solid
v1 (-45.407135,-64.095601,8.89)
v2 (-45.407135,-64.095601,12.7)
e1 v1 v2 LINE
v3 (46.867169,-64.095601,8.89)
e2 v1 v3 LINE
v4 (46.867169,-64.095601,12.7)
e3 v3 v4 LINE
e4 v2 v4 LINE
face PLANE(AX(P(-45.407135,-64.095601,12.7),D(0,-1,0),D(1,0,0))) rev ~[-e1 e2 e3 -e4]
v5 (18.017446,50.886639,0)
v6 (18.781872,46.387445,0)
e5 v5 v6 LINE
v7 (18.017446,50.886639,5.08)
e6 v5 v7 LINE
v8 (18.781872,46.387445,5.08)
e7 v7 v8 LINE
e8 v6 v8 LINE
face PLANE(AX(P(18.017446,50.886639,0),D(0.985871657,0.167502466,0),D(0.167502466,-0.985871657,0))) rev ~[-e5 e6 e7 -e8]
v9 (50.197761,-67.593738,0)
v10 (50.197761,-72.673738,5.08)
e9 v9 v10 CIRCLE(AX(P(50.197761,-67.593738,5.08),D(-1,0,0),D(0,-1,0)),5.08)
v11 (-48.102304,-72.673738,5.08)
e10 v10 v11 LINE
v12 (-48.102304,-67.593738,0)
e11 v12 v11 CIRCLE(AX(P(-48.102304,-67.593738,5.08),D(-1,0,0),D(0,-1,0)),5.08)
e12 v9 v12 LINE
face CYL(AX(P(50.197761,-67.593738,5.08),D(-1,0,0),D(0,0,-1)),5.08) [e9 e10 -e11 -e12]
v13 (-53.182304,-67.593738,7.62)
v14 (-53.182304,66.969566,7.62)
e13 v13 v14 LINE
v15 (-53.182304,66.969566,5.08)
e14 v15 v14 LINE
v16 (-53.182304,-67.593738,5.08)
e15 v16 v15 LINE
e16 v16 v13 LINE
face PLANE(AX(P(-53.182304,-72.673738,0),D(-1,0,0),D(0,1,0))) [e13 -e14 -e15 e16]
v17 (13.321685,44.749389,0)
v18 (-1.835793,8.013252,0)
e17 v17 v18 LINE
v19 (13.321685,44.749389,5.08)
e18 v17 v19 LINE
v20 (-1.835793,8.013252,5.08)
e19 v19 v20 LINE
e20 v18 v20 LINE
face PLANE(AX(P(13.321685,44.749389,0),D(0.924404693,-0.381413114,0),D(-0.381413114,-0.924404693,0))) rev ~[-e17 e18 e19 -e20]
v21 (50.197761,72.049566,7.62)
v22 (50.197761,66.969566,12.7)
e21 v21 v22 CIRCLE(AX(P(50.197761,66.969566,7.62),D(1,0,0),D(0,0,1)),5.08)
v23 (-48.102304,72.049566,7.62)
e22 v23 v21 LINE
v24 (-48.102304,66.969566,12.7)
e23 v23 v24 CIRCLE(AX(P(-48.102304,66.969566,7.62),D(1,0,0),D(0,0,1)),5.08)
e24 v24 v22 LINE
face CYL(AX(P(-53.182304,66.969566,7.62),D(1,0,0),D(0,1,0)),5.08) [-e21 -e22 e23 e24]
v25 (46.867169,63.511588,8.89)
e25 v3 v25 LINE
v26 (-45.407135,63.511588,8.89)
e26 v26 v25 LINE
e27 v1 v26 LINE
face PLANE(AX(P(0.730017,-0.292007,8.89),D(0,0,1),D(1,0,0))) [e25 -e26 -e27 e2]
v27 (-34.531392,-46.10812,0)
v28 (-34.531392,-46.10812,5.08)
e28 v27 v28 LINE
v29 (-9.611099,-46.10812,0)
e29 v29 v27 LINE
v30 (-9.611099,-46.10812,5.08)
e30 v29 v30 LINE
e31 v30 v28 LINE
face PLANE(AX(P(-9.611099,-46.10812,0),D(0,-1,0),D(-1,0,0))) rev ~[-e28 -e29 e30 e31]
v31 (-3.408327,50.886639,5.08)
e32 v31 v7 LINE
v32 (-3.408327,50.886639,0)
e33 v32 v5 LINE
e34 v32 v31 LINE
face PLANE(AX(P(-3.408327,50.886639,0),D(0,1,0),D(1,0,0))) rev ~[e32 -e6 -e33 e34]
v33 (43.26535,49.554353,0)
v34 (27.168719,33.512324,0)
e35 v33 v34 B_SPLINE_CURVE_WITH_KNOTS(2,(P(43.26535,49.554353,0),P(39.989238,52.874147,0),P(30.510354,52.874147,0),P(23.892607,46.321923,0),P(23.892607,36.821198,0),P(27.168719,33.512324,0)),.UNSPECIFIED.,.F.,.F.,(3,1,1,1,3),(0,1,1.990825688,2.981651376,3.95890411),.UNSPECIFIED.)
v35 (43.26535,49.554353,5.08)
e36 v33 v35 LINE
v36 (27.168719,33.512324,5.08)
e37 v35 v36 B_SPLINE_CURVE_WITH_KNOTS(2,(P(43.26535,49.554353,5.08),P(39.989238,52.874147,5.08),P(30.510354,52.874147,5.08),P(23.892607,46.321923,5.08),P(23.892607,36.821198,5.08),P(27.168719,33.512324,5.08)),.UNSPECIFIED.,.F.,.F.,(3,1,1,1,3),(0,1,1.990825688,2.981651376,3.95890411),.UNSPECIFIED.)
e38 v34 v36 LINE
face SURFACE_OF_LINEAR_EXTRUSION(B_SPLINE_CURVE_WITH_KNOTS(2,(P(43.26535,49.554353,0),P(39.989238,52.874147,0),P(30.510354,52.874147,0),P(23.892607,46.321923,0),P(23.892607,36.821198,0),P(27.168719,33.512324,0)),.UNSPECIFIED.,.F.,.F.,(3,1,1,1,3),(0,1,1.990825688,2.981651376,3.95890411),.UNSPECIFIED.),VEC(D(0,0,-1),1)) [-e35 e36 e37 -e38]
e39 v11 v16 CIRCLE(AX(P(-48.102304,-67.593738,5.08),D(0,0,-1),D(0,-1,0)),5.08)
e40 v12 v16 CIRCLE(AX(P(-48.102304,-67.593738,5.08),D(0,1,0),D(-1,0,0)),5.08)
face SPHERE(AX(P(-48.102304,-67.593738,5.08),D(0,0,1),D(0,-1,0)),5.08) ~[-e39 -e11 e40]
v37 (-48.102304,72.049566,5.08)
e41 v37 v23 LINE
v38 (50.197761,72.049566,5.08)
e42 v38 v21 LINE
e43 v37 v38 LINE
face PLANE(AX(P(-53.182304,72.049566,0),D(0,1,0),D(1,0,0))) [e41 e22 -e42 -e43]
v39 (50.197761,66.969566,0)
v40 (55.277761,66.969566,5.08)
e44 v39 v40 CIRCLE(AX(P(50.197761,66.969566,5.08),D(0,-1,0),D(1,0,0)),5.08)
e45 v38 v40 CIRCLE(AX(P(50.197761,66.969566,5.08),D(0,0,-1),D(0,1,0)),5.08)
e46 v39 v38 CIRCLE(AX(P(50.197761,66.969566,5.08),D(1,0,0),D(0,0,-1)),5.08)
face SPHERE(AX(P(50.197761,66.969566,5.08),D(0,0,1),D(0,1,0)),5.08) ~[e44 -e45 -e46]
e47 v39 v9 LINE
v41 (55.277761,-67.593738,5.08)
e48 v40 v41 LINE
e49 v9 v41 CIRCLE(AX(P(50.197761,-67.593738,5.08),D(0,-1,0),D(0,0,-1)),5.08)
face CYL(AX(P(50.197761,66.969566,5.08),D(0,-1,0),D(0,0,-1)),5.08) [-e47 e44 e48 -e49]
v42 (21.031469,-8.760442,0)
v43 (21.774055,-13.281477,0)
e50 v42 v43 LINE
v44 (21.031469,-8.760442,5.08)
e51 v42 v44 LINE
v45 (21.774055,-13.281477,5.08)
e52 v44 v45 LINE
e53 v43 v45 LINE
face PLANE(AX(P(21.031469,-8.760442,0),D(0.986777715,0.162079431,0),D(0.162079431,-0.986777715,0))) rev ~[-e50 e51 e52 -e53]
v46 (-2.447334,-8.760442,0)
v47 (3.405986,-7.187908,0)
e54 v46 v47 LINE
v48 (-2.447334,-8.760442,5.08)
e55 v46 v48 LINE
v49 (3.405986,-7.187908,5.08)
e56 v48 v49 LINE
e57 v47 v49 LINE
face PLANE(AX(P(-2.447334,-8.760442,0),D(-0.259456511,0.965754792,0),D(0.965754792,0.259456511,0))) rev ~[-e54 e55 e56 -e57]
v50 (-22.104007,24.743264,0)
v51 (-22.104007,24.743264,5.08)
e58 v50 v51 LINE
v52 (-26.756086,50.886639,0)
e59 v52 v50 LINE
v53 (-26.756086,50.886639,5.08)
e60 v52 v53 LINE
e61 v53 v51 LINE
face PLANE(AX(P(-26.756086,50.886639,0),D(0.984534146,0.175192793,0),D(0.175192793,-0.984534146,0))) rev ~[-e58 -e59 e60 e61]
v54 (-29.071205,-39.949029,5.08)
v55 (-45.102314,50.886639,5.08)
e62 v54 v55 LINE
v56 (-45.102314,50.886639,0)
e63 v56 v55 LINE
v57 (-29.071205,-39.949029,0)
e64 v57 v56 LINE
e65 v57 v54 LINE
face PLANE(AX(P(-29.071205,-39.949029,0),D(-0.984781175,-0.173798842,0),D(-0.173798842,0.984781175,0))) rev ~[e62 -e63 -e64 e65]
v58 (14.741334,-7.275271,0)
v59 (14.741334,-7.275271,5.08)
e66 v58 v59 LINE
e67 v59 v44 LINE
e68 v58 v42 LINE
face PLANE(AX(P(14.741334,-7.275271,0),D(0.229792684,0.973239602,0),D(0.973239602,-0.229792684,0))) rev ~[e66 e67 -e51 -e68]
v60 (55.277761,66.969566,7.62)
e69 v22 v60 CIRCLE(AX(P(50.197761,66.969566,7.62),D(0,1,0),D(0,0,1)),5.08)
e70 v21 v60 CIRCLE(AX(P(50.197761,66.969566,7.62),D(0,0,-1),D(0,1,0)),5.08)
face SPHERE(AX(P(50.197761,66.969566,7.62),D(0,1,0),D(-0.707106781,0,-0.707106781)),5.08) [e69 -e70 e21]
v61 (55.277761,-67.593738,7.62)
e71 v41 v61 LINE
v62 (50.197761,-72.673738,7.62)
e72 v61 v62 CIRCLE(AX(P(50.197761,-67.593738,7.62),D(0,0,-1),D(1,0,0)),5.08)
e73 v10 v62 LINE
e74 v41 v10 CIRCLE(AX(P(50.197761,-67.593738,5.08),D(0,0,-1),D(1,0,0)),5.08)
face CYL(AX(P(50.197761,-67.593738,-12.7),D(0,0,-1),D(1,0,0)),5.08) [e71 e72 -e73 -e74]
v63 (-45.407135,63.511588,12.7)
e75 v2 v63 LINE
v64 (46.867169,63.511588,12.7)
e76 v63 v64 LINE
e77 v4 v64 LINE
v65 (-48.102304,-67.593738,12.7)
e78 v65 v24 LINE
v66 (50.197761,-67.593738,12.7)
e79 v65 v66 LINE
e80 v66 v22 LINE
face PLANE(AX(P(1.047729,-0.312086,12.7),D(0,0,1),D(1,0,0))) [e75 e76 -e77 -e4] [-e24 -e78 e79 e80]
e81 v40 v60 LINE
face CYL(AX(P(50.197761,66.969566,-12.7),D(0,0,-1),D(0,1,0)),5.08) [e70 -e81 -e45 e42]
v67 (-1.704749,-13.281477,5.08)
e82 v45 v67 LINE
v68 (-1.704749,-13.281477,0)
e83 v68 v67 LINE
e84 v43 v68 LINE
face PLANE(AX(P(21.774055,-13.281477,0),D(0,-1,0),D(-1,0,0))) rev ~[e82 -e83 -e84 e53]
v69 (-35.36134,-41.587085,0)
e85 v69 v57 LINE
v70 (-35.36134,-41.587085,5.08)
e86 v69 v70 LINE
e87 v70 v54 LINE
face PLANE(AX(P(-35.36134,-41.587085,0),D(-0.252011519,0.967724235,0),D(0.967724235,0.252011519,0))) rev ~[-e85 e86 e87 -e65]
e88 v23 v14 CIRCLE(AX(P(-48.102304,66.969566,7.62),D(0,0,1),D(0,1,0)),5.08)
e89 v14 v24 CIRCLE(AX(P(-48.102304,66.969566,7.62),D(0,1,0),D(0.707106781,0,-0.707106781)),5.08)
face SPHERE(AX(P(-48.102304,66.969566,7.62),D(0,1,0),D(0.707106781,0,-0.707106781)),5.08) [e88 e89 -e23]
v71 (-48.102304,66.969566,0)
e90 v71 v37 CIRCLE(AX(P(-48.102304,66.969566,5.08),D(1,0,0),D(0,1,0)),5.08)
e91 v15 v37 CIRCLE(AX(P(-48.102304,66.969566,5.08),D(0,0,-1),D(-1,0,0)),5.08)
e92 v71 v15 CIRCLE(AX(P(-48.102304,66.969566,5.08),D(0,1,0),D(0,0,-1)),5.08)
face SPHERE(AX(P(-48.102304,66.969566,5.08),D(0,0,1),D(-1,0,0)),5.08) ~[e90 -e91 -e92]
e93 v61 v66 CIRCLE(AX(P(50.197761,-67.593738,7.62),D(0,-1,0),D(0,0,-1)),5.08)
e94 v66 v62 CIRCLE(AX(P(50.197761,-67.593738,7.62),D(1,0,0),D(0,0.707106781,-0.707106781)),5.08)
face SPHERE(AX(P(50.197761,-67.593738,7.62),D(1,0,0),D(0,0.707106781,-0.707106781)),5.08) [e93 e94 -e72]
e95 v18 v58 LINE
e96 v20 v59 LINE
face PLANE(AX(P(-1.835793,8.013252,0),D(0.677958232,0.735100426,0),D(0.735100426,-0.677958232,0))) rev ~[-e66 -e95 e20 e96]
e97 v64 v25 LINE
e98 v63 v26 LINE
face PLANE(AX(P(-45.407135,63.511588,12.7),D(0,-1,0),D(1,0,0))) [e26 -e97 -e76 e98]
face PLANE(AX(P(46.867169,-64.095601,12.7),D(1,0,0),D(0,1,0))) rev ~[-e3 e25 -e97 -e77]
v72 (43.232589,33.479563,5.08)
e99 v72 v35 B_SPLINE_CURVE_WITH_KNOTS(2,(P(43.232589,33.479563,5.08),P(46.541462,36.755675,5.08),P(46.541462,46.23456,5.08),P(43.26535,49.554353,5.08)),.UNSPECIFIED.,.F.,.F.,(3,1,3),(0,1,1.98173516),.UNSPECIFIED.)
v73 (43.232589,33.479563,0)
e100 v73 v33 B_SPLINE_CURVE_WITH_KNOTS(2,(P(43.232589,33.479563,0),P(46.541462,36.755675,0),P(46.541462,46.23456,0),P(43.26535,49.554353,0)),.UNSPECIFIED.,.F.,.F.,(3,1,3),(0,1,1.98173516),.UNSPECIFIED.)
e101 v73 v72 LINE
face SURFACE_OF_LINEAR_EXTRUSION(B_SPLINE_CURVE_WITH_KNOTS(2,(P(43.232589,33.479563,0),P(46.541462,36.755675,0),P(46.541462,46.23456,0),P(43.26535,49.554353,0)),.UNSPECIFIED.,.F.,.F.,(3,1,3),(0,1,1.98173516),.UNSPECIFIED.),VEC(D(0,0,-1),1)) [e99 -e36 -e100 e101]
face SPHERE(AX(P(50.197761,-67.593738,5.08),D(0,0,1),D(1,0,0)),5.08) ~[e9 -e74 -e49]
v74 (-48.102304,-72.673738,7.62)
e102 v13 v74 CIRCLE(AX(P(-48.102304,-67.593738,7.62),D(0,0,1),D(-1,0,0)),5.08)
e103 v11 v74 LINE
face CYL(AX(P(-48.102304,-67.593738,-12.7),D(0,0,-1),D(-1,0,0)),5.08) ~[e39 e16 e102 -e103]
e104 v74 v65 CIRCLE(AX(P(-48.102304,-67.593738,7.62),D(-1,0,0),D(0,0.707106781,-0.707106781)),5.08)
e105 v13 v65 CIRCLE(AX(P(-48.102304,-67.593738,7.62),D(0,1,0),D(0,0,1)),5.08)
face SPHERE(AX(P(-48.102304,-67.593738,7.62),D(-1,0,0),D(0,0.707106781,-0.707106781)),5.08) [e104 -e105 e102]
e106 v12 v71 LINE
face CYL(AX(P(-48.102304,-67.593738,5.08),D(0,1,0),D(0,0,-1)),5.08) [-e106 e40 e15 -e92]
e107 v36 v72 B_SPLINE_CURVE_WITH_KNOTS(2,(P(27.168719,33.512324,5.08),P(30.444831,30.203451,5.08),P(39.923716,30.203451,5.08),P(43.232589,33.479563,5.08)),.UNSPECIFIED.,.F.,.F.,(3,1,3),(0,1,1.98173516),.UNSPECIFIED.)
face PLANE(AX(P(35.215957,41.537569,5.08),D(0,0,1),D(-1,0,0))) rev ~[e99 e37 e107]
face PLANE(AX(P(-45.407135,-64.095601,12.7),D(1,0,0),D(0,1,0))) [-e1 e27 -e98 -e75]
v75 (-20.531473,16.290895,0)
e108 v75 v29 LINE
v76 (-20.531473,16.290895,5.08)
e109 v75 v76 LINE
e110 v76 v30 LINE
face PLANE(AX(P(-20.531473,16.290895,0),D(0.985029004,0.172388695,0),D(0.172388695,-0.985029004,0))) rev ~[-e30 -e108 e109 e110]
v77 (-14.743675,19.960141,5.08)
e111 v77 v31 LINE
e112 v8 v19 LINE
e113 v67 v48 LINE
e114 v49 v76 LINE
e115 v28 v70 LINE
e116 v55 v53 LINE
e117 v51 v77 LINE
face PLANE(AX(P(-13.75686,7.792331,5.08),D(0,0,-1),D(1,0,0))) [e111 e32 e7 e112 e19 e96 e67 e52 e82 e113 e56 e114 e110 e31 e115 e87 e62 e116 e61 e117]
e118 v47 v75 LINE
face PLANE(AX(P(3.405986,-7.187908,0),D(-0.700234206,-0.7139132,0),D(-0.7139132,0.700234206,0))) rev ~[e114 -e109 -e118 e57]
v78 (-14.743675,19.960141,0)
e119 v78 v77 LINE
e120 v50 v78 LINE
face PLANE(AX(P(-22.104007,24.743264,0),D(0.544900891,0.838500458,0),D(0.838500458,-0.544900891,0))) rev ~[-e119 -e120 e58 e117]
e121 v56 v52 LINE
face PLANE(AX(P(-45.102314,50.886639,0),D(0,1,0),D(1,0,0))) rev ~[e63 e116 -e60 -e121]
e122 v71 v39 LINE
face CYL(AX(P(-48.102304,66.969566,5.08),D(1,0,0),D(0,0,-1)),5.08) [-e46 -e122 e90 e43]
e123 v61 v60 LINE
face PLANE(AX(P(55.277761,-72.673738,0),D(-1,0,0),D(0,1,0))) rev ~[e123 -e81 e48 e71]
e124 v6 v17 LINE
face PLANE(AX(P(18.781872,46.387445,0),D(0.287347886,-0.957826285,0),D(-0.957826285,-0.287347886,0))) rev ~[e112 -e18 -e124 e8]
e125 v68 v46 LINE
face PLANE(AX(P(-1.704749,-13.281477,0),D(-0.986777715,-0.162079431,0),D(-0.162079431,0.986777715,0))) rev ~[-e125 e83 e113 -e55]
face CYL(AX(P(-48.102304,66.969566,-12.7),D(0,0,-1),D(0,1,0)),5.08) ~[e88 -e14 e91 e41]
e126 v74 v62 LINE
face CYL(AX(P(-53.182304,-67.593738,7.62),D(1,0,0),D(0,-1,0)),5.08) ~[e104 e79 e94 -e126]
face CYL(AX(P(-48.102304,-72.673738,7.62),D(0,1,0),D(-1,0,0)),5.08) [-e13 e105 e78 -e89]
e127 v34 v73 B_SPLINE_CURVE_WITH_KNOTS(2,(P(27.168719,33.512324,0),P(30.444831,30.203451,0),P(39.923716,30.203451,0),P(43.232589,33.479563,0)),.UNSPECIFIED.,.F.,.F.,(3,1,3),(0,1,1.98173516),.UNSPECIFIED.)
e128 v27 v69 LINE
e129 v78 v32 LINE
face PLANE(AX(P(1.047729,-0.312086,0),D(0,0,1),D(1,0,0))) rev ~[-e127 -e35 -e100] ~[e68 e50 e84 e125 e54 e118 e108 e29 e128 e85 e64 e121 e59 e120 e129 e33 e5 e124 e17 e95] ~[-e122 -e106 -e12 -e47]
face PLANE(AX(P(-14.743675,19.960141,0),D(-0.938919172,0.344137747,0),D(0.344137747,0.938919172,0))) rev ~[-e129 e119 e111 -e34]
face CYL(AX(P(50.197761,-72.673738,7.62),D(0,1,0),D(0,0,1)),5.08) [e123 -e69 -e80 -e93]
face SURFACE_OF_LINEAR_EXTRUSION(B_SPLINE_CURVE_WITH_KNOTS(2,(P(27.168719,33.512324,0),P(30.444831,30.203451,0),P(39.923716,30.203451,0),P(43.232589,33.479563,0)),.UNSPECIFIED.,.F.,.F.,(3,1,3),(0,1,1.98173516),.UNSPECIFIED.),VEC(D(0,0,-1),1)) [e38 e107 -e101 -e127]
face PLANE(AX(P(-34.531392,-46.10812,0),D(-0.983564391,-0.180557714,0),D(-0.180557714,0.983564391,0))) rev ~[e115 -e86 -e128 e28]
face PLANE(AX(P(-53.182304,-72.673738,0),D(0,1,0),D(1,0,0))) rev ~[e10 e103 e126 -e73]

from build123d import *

# Parameters (mm, degrees)
F0_W         = 108.4600649774
F0_H         = 144.723303616
F1_DEPTH     = 12.7
F2_W         = 92.2743044794
F2_H         = 127.6071891189
F3_DEPTH     = 3.81
F4_R         = 5.08
F5_T1_DEPTH  = 20.32
F5_S5_W      = 5.08
F5_S5_H      = 5.08
F5_T6_DEPTH  = 5.08
F5_S11_W     = 5.08
F5_S11_H     = 5.08
F5_T12_DEPTH = 5.08
F5_S17_W     = 5.08
F5_S17_H     = 5.08
F5_T18_DEPTH = 5.08
F5_S23_W     = 5.08
F5_S23_H     = 5.08
F5_T24_DEPTH = 5.08
F7_DEPTH     = 5.08
F8_DEPTH     = 5.08
F9_R         = 5.08


# Not quite as in the source:
# - a fillet or chamfer that OpenCascade refuses, or shapes differently, is made with other operations: its cross-section is extruded or revolved along the edge and cut away or added


with BuildPart() as f1:
    # F0 (on Top) → F1 (new body)
    with BuildSketch(Plane.XY):
        with Locations((1.0477285832, -0.3120861948)):
            Rectangle(F0_W, F0_H)
    extrude(amount=F1_DEPTH)

    # F2 (on face) → F3 (cut, symmetric)
    with BuildSketch(Plane.XY.offset(12.7)):
        with Locations((0.7300172001, -0.29200688)):
            Rectangle(F2_W, F2_H)
    extrude(amount=F3_DEPTH, both=True, mode=Mode.SUBTRACT)

    # F4
    f4_edges = [f1.edges().sort_by_distance(p)[0] for p in [
        (1.047729, 72.049566, 12.7),
        (-53.182304, -0.312086, 12.7),
        (55.277761, -0.312086, 12.7),
        (1.047729, -72.673738, 12.7),
    ]]
    fillet(f4_edges, radius=F4_R)

    # F5: fillet of radius 5.08 on 4 edges, made by hand

    # F5_s2 → F5_t1 (cut)
    with BuildSketch(Plane.XY.offset(-12.7)):
        with BuildLine():
            ThreePointArc((-48.1023039055, 72.0495656133), (-51.6944063539, 70.5616680617), (-53.1823039055, 66.9695656133))
            Line((-53.1823039055, 66.9695656133), (-53.1823039055, 72.0495656133))
            Line((-53.1823039055, 72.0495656133), (-48.1023039055, 72.0495656133))
        make_face()
        with BuildLine():
            ThreePointArc((55.2777610719, -67.5937380028), (53.7898635203, -71.1858404512), (50.1977610719, -72.6737380028))
            Line((50.1977610719, -72.6737380028), (55.2777610719, -72.6737380028))
            Line((55.2777610719, -72.6737380028), (55.2777610719, -67.5937380028))
        make_face()
        with BuildLine():
            ThreePointArc((50.1977610719, 72.0495656133), (53.7898635203, 70.5616680617), (55.2777610719, 66.9695656133))
            Line((55.2777610719, 66.9695656133), (55.2777610719, 72.0495656133))
            Line((55.2777610719, 72.0495656133), (50.1977610719, 72.0495656133))
        make_face()
        with BuildLine():
            ThreePointArc((-53.1823039055, -67.5937380028), (-51.6944063539, -71.1858404512), (-48.1023039055, -72.6737380028))
            Line((-48.1023039055, -72.6737380028), (-53.1823039055, -72.6737380028))
            Line((-53.1823039055, -72.6737380028), (-53.1823039055, -67.5937380028))
        make_face()
    extrude(amount=F5_T1_DEPTH, mode=Mode.SUBTRACT)


with BuildPart() as f5_tool4:
    # F5_s5 → F5_t6 (new body)
    with BuildSketch(Plane.YZ.offset(-48.1023039055)):
        with Locations((-70.1337380028, 10.16)):
            Rectangle(F5_S5_W, F5_S5_H)
    extrude(amount=-F5_T6_DEPTH)

    # F5_s7 → F5_t8 (revolve, cut)
    with BuildSketch(Plane(origin=(-48.1023039055, -67.5937380028, 7.62), x_dir=(0, 0.7071067812, -0.7071067812), z_dir=(0, 0.7071067812, 0.7071067812))):
        with BuildLine():
            ThreePointArc((0, -5.08), (5.08, 0), (0, 5.08))
            Line((0, 5.08), (0, -5.08))
        make_face()
    revolve(axis=Axis((-48.1023039055, -67.5937380028, 7.62), (-1, 0, 0)), mode=Mode.SUBTRACT)


with BuildPart() as f1_1:
    add(f1.part)

    # F5_t3: cut F5_tool4
    add(f5_tool4.part, mode=Mode.SUBTRACT)


with BuildPart() as f5_tool10:
    # F5_s11 → F5_t12 (new body)
    with BuildSketch(Plane.XZ.offset(-66.9695656133)):
        with Locations((52.7377610719, 10.16)):
            Rectangle(F5_S11_W, F5_S11_H)
    extrude(amount=-F5_T12_DEPTH)

    # F5_s13 → F5_t14 (revolve, cut)
    with BuildSketch(Plane(origin=(50.1977610719, 66.9695656133, 7.62), x_dir=(-0.7071067812, 0, -0.7071067812), z_dir=(0.7071067812, 0, -0.7071067812))):
        with BuildLine():
            ThreePointArc((0, -5.08), (5.08, 0), (0, 5.08))
            Line((0, 5.08), (0, -5.08))
        make_face()
    revolve(axis=Axis((50.1977610719, 66.9695656133, 7.62), (0, 1, 0)), mode=Mode.SUBTRACT)


with BuildPart() as f1_2:
    add(f1_1.part)

    # F5_t9: cut F5_tool10
    add(f5_tool10.part, mode=Mode.SUBTRACT)


with BuildPart() as f5_tool16:
    # F5_s17 → F5_t18 (new body)
    with BuildSketch(Plane.YZ.offset(50.1977610719)):
        with Locations((-70.1337380028, 10.16)):
            Rectangle(F5_S17_W, F5_S17_H)
    extrude(amount=F5_T18_DEPTH)

    # F5_s19 → F5_t20 (revolve, cut)
    with BuildSketch(Plane(origin=(50.1977610719, -67.5937380028, 7.62), x_dir=(0, 0.7071067812, -0.7071067812), z_dir=(0, -0.7071067812, -0.7071067812))):
        with BuildLine():
            ThreePointArc((0, -5.08), (5.08, 0), (0, 5.08))
            Line((0, 5.08), (0, -5.08))
        make_face()
    revolve(axis=Axis((50.1977610719, -67.5937380028, 7.62), (1, 0, 0)), mode=Mode.SUBTRACT)


with BuildPart() as f1_3:
    add(f1_2.part)

    # F5_t15: cut F5_tool16
    add(f5_tool16.part, mode=Mode.SUBTRACT)


with BuildPart() as f5_tool22:
    # F5_s23 → F5_t24 (new body)
    with BuildSketch(Plane.XZ.offset(-66.9695656133)):
        with Locations((-50.6423039055, 10.16)):
            Rectangle(F5_S23_W, F5_S23_H)
    extrude(amount=-F5_T24_DEPTH)

    # F5_s25 → F5_t26 (revolve, cut)
    with BuildSketch(Plane(origin=(-48.1023039055, 66.9695656133, 7.62), x_dir=(0.7071067812, 0, -0.7071067812), z_dir=(0.7071067812, 0, 0.7071067812))):
        with BuildLine():
            ThreePointArc((0, -5.08), (5.08, 0), (0, 5.08))
            Line((0, 5.08), (0, -5.08))
        make_face()
    revolve(axis=Axis((-48.1023039055, 66.9695656133, 7.62), (0, 1, 0)), mode=Mode.SUBTRACT)


with BuildPart() as f1_4:
    add(f1_3.part)

    # F5_t21: cut F5_tool22
    add(f5_tool22.part, mode=Mode.SUBTRACT)

    # F6 (on face) → F7 (cut)
    with BuildSketch(Plane(origin=(0, 0, 0), x_dir=(1, 0, 0), z_dir=(0, 0, -1))):
        Polygon((3.4059861085, 7.1879082529), (-20.5314729904, -16.2908951516), (-9.6110993139, 46.108120036), (-34.5313920437, 46.108120036), (-35.3613404431, 41.5870853339), (-29.0712052055, 39.9490292824), (-45.1023137626, -50.8866389588), (-26.7560859861, -50.8866389588), (-22.1040067999, -24.7432643772), (-14.7436749419, -19.9601407069), (-3.4083270657, -50.8866389588), (18.0174460877, -50.8866389588), (18.781872245, -46.3874450041), (13.3216854068, -44.7493889526), (-1.8357932562, -8.0132519048), (14.7413339847, 7.2752712423), (21.0314692224, 8.7604420623), (21.7740546324, 13.2814767644), (-1.7047487721, 13.2814767644), (-2.4473341821, 8.7604420623), align=None)
    extrude(amount=-F7_DEPTH, mode=Mode.SUBTRACT)

    # F6 (on face) → F8 (cut)
    with BuildSketch(Plane(origin=(0, 0, 0), x_dir=(1, 0, 0), z_dir=(0, 0, -1))):
        with BuildLine():
            add(Edge.make_bspline(
                [(35.2279550018, -52.874146968), (30.5103535736, -52.874146968), (27.2014803496, -49.598034865)],
                knots=[0, 0, 0, 1, 1, 1], degree=2))
            add(Edge.make_bspline(
                [(43.2653500278, -49.5543533703), (39.9892379248, -52.874146968), (35.2279550018, -52.874146968)],
                knots=[0, 0, 0, 1, 1, 1], degree=2))
            add(Edge.make_bspline(
                [(46.5414621307, -41.5387990917), (46.5414621307, -46.2345597726), (43.2653500278, -49.5543533703)],
                knots=[0, 0, 0, 1, 1, 1], degree=2))
            add(Edge.make_bspline(
                [(43.2325889067, -33.4795633185), (46.5414621307, -36.7556754214), (46.5414621307, -41.5387990917)],
                knots=[0, 0, 0, 1, 1, 1], degree=2))
            add(Edge.make_bspline(
                [(35.2279550018, -30.2034512155), (39.9237156827, -30.2034512155), (43.2325889067, -33.4795633185)],
                knots=[0, 0, 0, 1, 1, 1], degree=2))
            add(Edge.make_bspline(
                [(27.1687192286, -33.5123244395), (30.4448313315, -30.2034512155), (35.2279550018, -30.2034512155)],
                knots=[0, 0, 0, 1, 1, 1], degree=2))
            add(Edge.make_bspline(
                [(23.8926071256, -41.5387990917), (23.8926071256, -36.8211976635), (27.1687192286, -33.5123244395)],
                knots=[0, 0, 0, 1, 1, 1], degree=2))
            add(Edge.make_bspline(
                [(27.2014803496, -49.598034865), (23.8926071256, -46.321922762), (23.8926071256, -41.5387990917)],
                knots=[0, 0, 0, 1, 1, 1], degree=2))
        make_face()
    extrude(amount=-F8_DEPTH, mode=Mode.SUBTRACT)

    # F9
    f9_edges = [f1_4.edges().sort_by_distance(p)[0] for p in [
        (-51.694406, -71.18584, 0),
    ]]
    fillet(f9_edges, radius=F9_R)


solid = f1_4.part
